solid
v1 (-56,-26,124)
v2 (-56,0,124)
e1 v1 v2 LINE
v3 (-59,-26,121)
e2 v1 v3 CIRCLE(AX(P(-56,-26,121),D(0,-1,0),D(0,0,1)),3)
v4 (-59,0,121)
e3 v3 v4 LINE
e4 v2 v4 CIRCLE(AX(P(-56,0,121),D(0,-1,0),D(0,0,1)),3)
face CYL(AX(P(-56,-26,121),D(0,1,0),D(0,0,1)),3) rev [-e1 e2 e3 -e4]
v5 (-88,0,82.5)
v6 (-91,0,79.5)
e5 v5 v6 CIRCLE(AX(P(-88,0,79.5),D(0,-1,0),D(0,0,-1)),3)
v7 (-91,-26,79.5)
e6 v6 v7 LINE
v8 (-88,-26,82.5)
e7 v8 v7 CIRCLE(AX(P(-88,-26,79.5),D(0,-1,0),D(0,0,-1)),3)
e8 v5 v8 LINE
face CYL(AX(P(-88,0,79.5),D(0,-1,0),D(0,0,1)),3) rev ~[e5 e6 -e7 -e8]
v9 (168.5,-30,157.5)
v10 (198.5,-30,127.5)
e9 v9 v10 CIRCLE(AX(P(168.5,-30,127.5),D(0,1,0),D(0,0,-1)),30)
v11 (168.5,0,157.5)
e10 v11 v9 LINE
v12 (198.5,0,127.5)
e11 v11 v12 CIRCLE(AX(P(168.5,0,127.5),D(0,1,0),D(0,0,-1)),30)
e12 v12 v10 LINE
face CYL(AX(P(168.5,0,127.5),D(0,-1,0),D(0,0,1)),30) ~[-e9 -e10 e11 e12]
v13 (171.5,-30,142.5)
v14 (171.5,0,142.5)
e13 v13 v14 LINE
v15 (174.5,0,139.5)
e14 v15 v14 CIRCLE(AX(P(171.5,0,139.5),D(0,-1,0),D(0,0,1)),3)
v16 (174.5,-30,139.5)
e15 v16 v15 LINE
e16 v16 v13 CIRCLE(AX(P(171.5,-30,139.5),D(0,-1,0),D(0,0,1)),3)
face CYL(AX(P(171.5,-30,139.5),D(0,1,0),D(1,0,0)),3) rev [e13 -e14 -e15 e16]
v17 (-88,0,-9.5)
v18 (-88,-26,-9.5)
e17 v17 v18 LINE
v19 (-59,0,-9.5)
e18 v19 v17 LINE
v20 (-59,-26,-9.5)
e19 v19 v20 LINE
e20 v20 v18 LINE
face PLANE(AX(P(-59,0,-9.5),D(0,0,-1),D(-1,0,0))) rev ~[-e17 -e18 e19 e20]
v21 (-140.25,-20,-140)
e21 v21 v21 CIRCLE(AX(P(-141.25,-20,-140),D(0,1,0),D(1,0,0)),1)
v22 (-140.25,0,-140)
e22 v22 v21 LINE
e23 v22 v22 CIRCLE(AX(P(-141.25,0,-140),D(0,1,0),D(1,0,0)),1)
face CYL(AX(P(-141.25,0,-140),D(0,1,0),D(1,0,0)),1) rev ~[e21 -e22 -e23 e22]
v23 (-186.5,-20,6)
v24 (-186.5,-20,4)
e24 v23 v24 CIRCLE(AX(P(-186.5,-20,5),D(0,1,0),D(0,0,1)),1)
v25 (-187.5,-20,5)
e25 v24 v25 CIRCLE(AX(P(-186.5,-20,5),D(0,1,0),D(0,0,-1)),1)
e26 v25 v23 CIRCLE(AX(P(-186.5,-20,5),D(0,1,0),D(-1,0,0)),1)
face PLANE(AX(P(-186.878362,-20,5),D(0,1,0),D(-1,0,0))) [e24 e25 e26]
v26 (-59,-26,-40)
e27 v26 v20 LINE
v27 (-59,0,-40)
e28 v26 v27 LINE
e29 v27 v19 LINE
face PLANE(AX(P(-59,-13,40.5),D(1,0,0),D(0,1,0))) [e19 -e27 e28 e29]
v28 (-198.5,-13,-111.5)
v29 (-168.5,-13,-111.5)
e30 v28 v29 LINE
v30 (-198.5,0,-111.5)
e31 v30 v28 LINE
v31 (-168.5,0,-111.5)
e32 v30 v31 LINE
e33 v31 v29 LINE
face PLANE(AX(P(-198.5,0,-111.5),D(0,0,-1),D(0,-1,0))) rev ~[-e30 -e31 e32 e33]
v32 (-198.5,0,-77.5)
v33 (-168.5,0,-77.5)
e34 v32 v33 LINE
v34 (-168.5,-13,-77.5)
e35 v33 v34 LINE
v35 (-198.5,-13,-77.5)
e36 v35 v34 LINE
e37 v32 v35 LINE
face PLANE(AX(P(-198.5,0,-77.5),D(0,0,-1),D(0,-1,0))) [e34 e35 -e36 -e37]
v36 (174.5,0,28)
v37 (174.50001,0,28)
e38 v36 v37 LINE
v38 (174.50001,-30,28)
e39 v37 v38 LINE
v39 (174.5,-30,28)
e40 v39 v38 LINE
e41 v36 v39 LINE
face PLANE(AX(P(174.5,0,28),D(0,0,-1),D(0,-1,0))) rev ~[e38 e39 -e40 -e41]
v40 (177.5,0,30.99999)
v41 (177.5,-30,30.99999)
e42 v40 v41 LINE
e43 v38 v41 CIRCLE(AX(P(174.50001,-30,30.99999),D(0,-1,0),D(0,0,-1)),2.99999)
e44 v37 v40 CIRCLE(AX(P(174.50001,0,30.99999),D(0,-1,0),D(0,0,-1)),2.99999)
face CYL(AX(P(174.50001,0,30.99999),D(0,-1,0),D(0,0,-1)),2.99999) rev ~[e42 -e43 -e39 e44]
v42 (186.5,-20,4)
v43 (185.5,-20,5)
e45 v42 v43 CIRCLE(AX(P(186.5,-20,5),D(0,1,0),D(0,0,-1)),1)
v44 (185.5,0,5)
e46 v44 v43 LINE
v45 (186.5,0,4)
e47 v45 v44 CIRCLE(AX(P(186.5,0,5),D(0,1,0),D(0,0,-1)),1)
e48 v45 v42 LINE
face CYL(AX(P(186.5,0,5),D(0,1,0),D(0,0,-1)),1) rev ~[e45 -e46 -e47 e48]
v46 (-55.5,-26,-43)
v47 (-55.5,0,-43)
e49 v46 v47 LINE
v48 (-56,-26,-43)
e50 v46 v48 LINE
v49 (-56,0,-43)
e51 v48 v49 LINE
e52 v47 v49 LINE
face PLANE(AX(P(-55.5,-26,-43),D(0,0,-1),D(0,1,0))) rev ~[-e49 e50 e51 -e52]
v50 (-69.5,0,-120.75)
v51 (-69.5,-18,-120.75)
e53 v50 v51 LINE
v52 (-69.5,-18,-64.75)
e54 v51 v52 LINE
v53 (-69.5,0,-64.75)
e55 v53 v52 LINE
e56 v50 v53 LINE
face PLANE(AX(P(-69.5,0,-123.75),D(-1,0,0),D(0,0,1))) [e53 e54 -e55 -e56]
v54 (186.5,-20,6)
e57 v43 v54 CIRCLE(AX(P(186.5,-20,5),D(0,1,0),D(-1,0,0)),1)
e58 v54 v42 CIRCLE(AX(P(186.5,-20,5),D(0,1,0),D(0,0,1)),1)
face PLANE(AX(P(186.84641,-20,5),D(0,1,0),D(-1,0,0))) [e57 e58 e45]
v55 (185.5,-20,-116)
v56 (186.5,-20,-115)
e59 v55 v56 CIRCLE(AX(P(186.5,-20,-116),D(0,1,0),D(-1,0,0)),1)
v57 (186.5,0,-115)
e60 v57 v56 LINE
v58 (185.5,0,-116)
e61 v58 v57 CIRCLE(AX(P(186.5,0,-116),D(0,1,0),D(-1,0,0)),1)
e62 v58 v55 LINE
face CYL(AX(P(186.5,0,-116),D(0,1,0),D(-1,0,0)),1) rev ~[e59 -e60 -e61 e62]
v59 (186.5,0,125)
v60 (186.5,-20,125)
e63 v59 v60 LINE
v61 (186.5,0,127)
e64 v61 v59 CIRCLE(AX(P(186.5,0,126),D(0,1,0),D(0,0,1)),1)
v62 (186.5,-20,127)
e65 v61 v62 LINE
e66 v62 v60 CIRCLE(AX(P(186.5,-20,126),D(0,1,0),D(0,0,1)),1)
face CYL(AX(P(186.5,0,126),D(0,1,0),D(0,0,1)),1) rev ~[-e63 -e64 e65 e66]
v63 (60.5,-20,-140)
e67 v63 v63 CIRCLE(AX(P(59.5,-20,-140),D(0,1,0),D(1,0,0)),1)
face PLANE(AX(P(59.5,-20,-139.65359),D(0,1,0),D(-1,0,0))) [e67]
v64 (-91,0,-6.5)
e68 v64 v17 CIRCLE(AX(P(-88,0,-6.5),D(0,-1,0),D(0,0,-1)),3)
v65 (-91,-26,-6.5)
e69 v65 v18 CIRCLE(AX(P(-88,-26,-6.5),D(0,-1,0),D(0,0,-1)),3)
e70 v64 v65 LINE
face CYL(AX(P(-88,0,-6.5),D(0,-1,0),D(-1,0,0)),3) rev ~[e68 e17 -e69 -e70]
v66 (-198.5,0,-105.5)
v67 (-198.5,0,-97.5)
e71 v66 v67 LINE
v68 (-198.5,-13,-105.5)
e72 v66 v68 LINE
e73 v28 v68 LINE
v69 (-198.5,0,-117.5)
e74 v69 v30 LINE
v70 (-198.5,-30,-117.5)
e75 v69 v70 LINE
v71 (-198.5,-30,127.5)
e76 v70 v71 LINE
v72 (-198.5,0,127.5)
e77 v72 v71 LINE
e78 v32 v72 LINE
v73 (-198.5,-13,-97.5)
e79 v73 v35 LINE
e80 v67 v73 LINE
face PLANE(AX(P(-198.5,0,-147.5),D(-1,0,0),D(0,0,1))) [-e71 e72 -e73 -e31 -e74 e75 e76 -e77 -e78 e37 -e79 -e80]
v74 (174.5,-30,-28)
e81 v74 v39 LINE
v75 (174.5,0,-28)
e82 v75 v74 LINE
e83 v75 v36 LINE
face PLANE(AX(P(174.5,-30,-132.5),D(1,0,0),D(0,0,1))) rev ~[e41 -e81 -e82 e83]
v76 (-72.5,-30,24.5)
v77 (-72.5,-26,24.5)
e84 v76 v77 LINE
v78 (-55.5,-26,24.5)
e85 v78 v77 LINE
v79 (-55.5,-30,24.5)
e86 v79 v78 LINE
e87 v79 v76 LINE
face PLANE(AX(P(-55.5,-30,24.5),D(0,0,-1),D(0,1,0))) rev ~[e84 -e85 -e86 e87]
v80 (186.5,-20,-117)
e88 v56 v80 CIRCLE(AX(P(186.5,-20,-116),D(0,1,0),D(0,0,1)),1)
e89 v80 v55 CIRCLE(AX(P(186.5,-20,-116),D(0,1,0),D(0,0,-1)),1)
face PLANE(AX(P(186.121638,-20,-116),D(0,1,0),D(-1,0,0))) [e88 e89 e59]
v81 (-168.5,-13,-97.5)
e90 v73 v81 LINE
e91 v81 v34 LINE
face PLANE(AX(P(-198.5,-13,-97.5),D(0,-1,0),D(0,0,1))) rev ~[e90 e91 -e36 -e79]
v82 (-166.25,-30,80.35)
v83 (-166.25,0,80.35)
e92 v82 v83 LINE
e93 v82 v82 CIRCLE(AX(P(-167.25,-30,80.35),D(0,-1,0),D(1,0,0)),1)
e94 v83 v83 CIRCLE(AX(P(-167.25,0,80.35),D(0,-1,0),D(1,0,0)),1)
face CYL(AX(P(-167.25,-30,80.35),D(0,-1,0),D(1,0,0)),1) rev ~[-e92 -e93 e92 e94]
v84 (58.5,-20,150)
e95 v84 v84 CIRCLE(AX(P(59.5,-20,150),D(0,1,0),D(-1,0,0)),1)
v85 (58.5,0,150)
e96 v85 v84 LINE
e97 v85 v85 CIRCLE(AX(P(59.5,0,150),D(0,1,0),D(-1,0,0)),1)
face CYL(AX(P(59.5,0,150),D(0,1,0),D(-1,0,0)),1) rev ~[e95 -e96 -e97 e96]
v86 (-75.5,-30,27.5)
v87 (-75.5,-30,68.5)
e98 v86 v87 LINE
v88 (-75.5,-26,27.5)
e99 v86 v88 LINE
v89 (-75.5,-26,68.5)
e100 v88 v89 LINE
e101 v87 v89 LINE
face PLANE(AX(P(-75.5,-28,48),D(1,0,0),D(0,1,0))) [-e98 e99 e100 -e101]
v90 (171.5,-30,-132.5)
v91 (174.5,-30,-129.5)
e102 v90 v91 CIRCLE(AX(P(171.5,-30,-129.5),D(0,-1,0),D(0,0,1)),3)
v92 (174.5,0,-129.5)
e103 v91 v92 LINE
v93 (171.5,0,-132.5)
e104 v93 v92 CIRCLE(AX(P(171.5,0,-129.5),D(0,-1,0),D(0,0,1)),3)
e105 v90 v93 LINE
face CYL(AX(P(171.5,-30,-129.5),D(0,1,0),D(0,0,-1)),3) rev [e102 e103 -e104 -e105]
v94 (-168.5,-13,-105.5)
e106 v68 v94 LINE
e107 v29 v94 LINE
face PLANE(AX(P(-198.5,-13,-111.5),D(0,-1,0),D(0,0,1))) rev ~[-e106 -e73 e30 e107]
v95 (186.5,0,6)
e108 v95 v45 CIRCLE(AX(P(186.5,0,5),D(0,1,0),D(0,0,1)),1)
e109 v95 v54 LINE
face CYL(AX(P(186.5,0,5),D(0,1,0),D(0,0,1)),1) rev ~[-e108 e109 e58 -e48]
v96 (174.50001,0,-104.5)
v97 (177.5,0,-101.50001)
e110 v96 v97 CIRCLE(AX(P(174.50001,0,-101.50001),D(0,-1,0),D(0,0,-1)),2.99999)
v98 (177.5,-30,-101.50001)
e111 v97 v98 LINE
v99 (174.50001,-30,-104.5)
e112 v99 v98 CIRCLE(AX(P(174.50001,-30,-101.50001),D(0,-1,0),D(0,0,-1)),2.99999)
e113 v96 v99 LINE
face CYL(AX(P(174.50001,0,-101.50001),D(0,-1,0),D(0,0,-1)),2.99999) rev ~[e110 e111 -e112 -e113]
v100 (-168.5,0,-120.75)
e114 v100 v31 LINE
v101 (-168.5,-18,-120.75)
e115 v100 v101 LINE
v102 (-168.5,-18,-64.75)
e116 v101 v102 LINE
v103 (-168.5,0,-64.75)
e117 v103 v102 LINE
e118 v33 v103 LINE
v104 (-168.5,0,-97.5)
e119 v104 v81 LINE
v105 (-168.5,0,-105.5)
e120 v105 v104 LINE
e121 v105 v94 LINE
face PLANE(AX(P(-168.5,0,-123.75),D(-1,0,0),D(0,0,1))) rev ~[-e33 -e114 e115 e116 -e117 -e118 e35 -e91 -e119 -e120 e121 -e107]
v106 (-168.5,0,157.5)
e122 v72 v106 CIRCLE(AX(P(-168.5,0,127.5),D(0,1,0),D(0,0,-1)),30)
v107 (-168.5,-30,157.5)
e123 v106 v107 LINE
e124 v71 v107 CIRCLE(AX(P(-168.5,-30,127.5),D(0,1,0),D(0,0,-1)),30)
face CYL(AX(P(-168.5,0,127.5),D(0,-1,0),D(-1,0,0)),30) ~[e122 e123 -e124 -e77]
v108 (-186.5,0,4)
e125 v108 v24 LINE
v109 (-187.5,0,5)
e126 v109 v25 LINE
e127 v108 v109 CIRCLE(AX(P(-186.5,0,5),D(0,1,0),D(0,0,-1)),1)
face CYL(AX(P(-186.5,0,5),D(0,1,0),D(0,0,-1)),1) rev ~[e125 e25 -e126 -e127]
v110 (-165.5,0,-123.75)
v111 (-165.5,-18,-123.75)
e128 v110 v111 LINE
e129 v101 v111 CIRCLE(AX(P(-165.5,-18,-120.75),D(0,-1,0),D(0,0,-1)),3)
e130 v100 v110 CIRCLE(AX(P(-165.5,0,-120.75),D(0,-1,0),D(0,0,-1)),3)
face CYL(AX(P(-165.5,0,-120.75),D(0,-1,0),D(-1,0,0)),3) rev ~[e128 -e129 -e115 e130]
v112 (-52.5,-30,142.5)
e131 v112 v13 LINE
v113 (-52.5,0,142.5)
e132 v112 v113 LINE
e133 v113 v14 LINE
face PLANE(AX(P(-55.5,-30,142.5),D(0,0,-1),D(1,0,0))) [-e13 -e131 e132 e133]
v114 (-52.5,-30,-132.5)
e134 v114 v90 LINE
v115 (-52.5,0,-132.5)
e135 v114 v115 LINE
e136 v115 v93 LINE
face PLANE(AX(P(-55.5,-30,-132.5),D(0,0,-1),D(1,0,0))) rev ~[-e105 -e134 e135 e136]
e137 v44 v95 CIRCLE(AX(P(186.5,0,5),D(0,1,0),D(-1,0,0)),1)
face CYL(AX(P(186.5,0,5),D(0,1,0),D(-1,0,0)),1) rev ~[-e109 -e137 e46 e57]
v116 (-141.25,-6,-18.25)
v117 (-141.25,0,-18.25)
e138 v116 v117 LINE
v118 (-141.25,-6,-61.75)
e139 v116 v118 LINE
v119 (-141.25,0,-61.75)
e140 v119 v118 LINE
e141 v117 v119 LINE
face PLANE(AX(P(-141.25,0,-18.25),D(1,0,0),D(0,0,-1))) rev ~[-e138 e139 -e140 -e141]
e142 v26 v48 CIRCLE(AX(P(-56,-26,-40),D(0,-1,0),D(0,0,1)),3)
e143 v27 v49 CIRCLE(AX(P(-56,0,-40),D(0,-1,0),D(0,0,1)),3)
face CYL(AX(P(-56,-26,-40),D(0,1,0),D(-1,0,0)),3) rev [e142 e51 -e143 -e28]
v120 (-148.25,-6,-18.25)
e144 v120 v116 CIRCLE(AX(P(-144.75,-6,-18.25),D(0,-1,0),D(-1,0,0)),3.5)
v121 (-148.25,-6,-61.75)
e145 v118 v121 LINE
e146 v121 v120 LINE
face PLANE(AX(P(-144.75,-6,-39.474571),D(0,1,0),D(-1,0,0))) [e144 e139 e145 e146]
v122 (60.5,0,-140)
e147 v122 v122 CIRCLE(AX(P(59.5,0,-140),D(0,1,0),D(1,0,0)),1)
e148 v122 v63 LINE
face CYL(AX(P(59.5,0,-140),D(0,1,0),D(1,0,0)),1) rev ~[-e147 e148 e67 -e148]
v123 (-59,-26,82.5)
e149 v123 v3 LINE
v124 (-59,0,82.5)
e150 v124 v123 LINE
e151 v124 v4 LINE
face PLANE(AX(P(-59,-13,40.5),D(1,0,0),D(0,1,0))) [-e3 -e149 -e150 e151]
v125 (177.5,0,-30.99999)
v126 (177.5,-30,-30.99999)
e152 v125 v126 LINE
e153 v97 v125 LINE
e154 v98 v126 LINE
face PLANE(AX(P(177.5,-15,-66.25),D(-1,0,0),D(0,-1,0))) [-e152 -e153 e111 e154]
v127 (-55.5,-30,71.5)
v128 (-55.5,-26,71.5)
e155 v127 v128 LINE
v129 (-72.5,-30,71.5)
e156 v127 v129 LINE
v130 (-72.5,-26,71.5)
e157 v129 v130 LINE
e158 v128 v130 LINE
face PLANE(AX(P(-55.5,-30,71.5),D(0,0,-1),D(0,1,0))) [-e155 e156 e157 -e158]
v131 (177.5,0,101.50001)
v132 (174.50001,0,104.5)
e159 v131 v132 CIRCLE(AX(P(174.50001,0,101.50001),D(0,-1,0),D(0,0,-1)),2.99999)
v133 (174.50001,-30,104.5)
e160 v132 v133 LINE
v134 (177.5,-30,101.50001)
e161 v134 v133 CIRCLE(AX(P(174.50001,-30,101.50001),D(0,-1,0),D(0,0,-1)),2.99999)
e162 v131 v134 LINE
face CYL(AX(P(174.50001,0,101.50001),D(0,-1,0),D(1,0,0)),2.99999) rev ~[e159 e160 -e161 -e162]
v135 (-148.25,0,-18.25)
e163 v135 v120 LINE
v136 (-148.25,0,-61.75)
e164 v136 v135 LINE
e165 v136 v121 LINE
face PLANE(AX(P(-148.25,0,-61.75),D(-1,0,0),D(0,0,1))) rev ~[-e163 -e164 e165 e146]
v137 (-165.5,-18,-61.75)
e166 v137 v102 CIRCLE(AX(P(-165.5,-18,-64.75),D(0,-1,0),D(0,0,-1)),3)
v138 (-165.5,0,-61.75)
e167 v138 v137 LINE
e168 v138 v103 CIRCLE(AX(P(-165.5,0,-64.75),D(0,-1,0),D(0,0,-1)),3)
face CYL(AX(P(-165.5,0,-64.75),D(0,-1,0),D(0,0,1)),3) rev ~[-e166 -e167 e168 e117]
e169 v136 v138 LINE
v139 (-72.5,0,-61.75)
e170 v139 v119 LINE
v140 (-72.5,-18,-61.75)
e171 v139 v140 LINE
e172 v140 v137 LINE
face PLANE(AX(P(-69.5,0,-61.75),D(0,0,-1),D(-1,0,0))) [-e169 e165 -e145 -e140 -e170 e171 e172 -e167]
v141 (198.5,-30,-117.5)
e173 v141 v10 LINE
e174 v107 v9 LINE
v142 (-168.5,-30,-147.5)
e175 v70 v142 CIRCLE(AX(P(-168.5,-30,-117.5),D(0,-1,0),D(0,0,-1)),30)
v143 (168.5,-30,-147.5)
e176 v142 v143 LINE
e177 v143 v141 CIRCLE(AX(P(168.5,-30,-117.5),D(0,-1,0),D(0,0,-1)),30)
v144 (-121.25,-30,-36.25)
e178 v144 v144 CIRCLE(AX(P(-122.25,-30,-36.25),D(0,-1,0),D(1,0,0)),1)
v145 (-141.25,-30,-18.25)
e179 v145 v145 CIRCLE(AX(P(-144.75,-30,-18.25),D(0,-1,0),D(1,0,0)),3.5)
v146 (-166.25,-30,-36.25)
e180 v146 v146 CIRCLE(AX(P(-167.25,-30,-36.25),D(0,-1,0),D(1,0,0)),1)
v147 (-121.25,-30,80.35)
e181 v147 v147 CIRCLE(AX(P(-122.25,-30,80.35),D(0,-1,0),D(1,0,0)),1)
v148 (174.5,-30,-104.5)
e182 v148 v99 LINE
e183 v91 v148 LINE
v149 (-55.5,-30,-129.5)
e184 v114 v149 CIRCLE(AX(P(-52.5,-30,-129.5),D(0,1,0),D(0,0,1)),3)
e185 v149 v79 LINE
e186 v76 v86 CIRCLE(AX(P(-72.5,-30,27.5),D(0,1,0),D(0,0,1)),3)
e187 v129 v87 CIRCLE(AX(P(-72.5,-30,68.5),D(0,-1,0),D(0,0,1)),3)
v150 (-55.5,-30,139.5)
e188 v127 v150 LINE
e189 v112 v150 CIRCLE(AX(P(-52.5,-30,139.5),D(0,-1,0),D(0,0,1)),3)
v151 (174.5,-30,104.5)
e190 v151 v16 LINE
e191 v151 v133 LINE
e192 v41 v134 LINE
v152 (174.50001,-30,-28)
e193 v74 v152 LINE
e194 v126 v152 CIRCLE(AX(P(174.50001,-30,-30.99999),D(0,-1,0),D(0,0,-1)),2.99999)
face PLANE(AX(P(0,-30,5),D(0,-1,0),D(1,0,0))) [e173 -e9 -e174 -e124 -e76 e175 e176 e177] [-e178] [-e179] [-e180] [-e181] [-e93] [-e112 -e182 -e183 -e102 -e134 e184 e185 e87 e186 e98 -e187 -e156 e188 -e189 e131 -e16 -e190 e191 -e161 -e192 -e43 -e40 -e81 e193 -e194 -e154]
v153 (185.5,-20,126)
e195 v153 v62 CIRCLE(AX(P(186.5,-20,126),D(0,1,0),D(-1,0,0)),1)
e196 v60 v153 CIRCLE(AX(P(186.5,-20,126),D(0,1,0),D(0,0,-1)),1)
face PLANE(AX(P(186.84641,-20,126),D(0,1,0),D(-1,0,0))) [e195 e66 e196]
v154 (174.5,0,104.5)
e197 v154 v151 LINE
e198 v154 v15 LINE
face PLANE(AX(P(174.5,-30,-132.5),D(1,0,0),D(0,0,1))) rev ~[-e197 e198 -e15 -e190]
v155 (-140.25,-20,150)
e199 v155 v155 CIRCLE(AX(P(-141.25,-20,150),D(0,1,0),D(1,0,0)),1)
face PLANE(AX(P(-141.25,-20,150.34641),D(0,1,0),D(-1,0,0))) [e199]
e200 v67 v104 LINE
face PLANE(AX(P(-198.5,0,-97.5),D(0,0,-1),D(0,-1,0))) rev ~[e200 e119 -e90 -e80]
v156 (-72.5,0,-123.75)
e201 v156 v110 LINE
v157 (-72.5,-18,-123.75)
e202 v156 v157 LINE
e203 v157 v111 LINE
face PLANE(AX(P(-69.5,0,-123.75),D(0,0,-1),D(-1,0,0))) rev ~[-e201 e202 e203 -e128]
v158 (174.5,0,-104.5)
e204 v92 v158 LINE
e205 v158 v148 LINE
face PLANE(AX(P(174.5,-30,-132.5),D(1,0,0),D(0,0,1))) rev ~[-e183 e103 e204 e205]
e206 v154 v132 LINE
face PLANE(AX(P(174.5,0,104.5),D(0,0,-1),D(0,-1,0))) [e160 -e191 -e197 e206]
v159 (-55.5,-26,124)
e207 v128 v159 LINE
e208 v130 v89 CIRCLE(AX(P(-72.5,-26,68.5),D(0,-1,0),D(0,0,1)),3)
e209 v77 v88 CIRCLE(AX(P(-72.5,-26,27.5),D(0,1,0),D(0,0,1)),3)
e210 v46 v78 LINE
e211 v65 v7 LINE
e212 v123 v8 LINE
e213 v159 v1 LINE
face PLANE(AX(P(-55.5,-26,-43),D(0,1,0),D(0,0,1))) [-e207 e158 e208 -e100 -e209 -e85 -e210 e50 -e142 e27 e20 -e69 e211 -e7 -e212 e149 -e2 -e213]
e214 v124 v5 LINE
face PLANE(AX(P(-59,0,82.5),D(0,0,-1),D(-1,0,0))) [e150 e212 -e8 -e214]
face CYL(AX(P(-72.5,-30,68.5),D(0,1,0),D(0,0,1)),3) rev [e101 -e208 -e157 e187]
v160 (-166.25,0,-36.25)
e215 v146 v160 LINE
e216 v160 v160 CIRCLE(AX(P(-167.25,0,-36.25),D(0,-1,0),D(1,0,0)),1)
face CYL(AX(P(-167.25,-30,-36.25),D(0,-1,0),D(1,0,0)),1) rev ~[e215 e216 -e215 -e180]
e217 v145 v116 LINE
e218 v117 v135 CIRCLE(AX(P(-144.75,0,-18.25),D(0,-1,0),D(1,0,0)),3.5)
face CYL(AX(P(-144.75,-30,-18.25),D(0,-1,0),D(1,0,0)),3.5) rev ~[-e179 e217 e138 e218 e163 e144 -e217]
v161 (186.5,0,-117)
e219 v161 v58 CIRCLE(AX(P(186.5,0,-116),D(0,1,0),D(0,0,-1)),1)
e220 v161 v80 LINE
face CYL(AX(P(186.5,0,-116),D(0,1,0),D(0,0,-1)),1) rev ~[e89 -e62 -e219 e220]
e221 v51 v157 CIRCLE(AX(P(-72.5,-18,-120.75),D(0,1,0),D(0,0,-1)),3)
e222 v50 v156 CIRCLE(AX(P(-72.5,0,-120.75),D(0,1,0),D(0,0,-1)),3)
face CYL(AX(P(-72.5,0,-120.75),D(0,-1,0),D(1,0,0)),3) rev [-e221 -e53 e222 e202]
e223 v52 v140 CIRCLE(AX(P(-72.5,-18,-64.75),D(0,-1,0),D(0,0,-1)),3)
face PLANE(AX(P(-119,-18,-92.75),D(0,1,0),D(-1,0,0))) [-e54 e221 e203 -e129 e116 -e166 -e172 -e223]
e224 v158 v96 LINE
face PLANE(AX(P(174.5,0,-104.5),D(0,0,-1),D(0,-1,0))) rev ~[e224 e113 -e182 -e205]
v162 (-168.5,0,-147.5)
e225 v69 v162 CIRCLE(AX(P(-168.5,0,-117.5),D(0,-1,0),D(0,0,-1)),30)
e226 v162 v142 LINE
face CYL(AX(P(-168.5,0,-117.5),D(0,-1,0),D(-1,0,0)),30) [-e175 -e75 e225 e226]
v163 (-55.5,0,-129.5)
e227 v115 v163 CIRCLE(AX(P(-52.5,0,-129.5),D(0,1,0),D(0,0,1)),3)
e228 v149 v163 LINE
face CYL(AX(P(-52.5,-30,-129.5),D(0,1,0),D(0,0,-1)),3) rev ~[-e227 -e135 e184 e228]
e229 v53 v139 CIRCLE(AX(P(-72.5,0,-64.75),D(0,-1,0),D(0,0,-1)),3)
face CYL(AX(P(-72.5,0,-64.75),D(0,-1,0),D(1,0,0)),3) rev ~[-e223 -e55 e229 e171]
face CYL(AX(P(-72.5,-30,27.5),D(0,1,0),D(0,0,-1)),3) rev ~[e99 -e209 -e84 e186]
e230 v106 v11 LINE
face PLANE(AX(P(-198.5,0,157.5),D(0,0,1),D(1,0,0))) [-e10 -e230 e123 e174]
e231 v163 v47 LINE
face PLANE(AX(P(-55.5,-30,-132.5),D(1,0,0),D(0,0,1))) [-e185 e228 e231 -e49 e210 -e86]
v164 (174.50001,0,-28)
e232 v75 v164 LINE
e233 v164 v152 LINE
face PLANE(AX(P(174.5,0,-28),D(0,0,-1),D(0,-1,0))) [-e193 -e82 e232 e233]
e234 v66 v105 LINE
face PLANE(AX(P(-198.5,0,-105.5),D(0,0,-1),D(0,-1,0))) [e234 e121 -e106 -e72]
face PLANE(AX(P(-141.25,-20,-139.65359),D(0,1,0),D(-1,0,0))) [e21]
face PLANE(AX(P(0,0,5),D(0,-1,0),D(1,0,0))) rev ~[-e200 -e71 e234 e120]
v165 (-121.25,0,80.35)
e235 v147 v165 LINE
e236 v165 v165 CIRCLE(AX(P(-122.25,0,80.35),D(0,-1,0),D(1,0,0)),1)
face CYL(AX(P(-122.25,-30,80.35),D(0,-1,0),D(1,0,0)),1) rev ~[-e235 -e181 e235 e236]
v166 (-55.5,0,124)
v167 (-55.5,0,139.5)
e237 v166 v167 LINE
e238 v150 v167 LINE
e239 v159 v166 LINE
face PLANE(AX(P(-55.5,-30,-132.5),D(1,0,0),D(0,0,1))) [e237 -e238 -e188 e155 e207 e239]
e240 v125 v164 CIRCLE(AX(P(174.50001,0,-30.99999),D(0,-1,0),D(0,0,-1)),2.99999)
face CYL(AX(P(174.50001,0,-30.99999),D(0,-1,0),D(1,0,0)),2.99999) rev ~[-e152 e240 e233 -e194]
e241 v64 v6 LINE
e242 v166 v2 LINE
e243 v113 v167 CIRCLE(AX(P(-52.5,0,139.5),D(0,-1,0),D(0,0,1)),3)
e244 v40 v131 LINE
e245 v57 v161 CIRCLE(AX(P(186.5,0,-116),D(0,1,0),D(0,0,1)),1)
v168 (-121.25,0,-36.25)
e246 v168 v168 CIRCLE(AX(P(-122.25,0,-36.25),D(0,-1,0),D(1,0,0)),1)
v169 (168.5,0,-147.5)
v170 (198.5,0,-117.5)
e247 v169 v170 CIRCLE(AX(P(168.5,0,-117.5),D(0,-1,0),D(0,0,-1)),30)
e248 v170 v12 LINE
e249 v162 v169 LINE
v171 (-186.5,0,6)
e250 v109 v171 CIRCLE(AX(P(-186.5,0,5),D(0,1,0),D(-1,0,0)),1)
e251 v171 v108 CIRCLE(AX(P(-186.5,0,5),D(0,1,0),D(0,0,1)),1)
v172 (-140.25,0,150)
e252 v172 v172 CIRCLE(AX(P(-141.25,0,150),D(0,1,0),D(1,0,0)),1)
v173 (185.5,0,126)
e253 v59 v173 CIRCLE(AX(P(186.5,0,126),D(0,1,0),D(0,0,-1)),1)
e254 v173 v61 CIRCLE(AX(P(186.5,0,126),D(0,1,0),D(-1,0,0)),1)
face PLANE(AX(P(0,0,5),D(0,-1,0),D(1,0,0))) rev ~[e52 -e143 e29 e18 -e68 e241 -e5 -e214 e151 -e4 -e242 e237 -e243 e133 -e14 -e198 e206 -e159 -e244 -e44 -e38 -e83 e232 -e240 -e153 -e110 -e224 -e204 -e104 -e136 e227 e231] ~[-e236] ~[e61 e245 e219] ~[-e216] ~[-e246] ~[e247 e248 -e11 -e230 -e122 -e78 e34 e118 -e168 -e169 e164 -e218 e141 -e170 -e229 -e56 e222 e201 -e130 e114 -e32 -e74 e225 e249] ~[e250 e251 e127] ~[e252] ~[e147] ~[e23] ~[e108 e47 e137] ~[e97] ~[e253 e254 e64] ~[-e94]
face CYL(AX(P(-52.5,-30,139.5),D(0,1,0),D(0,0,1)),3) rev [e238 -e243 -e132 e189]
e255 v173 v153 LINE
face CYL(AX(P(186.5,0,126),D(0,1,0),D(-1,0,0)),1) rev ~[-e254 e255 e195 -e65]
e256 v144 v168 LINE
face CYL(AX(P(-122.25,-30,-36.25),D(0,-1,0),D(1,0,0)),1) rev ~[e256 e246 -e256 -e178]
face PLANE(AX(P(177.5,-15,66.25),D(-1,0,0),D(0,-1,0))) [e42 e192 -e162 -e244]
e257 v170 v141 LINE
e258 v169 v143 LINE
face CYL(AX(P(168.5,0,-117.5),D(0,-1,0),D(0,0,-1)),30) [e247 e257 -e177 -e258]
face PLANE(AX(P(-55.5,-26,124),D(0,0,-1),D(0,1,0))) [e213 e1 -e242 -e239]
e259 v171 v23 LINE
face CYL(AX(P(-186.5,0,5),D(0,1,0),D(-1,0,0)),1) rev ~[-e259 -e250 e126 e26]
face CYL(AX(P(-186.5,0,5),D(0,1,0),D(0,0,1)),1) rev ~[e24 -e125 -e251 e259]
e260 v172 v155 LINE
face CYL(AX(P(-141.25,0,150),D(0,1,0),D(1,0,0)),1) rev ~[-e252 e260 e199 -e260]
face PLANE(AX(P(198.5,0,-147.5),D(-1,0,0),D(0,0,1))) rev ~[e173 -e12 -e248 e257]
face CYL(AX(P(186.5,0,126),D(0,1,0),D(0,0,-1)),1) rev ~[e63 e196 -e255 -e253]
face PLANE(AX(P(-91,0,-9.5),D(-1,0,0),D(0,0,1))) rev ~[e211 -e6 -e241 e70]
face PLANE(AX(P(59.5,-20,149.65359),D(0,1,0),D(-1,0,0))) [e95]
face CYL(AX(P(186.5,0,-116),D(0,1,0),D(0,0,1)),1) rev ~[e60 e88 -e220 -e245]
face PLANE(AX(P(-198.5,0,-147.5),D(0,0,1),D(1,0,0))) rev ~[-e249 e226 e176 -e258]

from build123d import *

# Parameters (mm, degrees)
F0_W      = 397
F0_H      = 305
F1_DEPTH  = 30
F2_W      = 230
F2_H      = 275
F3_DEPTH  = 30
F4_R      = 3
F5_R      = 30
F6_W      = 26
F6_H      = 167
F7_DEPTH  = 3.5
F8_R      = 3
F10_W     = 32
F10_H     = 92
F11_DEPTH = 26
F12_R     = 3
F13_W     = 4
F13_H     = 47
F14_DEPTH = 20
F15_R     = 3
F16_W     = 30
F16_H     = 76.5
F17_DEPTH = 3
F18_R     = 2.99999
F19_R     = 3.5
F20_DEPTH = 30
F21_W     = 99
F21_H     = 62
F22_DEPTH = 18
F23_R     = 3
F25_DEPTH = 6
F26_W     = 13
F26_H     = 20
F26_H_2   = 6
F27_DEPTH = 30
F28_R     = 1
F29_DEPTH = 30
F31_DEPTH = 20


# Not quite as in the source:
# - a fillet or chamfer is up to 0.001 mm smaller than in the source, because OpenCascade refuses the exact size
# - a feature names something its author has since deleted; it is built from what else it names


with BuildPart() as f1:
    # F0 (on Front) → F1 (new body)
    with BuildSketch(Plane.XZ):
        with Locations((0, 5)):
            Rectangle(F0_W, F0_H)
    extrude(amount=F1_DEPTH)

    # F2 (on face) → F3 (cut, through all)
    with BuildSketch(Plane.XZ.offset(30)):
        with Locations((59.5, 5)):
            Rectangle(F2_W, F2_H)
    extrude(amount=-F3_DEPTH, mode=Mode.SUBTRACT)

    # F4
    f4_edges = [f1.edges().sort_by_distance(p)[0] for p in [
        (-55.5, -15, 142.5),
        (174.5, -15, 142.5),
        (174.5, -15, -132.5),
        (-55.5, -15, -132.5),
    ]]
    fillet(f4_edges, radius=F4_R)

    # F5
    f5_edges = [f1.edges().sort_by_distance(p)[0] for p in [
        (-198.5, -15, -147.5),
        (-198.5, -15, 157.5),
        (198.5, -15, 157.5),
        (198.5, -15, -147.5),
    ]]
    fillet(f5_edges, radius=F5_R)

    # F6 (on face) → F7 (cut)
    with BuildSketch(Plane.YZ.offset(-55.5)):
        with Locations((-13, 40.5)):
            Rectangle(F6_W, F6_H)
    extrude(amount=-F7_DEPTH, mode=Mode.SUBTRACT)

    # F8
    f8_edges = [f1.edges().sort_by_distance(p)[0] for p in [
        (-59, -13, -43),
        (-59, -13, 124),
    ]]
    fillet(f8_edges, radius=F8_R)

    # F10 (on face) → F11 (cut)
    with BuildSketch(Plane(origin=(0, 0, 0), x_dir=(-1, 0, 0), z_dir=(0, 1, 0))):
        with Locations((75, 36.5)):
            Rectangle(F10_W, F10_H)
    extrude(amount=-F11_DEPTH, mode=Mode.SUBTRACT)

    # F12
    f12_edges = [f1.edges().sort_by_distance(p)[0] for p in [
        (-91, -13, -9.5),
        (-91, -13, 82.5),
    ]]
    fillet(f12_edges, radius=F12_R)

    # F13 (on face) → F14 (cut)
    with BuildSketch(Plane.YZ.offset(-55.5)):
        with Locations((-28, 48)):
            Rectangle(F13_W, F13_H)
    extrude(amount=-F14_DEPTH, mode=Mode.SUBTRACT)

    # F15
    f15_edges = [f1.edges().sort_by_distance(p)[0] for p in [
        (-75.5, -28, 24.5),
        (-75.5, -28, 71.5),
    ]]
    fillet(f15_edges, radius=F15_R)

    # F16 (on face) → F17 (cut)
    with BuildSketch(Plane(origin=(174.5, 0, 0), x_dir=(0, -1, 0), z_dir=(-1, 0, 0))):
        with Locations((15, -66.25)):
            Rectangle(F16_W, F16_H)
        with Locations((15, 66.25)):
            Rectangle(F16_W, F16_H)
    extrude(amount=-F17_DEPTH, mode=Mode.SUBTRACT)

    # F18 (radius 3 in the source; OpenCascade refuses exactly that, so slightly less here)
    f18_edges = [f1.edges().sort_by_distance(p)[0] for p in [
        (177.5, -15, -104.5),
        (177.5, -15, 28),
        (177.5, -15, 104.5),
        (177.5, -15, -28),
    ]]
    fillet(f18_edges, radius=F18_R)

    # F19 (on face) → F20 (cut)
    with BuildSketch(Plane.XZ.offset(30)):
        with Locations((-144.75, -18.25)):
            Circle(F19_R)
    extrude(amount=-F20_DEPTH, mode=Mode.SUBTRACT)

    # F21 (on face) → F22 (cut)
    with BuildSketch(Plane(origin=(0, 0, 0), x_dir=(-1, 0, 0), z_dir=(0, 1, 0))):
        with Locations((119, -92.75)):
            Rectangle(F21_W, F21_H)
    extrude(amount=-F22_DEPTH, mode=Mode.SUBTRACT)

    # F23
    f23_edges = [f1.edges().sort_by_distance(p)[0] for p in [
        (-168.5, -9, -123.75),
        (-69.5, -9, -123.75),
        (-69.5, -9, -61.75),
        (-168.5, -9, -61.75),
    ]]
    fillet(f23_edges, radius=F23_R)

    # F24 (on face) → F25 (cut)
    with BuildSketch(Plane(origin=(0, 0, 0), x_dir=(-1, 0, 0), z_dir=(0, 1, 0))):
        with BuildLine():
            ThreePointArc((148.25, -18.25), (144.75, -21.75), (141.25, -18.25))
            Line((141.25, -18.25), (141.25, -61.75))
            Line((141.25, -61.75), (148.25, -61.75))
            Line((148.25, -61.75), (148.25, -18.25))
        make_face()
    extrude(amount=-F25_DEPTH, mode=Mode.SUBTRACT)

    # F26 (on face) → F27 (cut)
    with BuildSketch(Plane(origin=(-198.5, 0, 0), x_dir=(0, -1, 0), z_dir=(-1, 0, 0))):
        with Locations((6.5, -87.5)):
            Rectangle(F26_W, F26_H)
        with Locations((6.5, -108.5)):
            Rectangle(F26_W, F26_H_2)
    extrude(amount=-F27_DEPTH, mode=Mode.SUBTRACT)

    # F28 (on face) → F29 (cut)
    with BuildSketch(Plane.XZ.offset(30)):
        with Locations((-167.25, 80.35)):
            Circle(F28_R)
        with Locations((-167.25, -36.25)):
            Circle(F28_R)
        with Locations((-122.25, -36.25)):
            Circle(F28_R)
        with Locations((-122.25, 80.35)):
            Circle(F28_R)
    extrude(amount=-F29_DEPTH, mode=Mode.SUBTRACT)

    # F30 (on face) → F31 (cut)
    with BuildSketch(Plane(origin=(0, 0, 0), x_dir=(-1, 0, 0), z_dir=(0, 1, 0))):
        with BuildLine():
            Line((-186.5, 125), (-186.5, 127))
            ThreePointArc((-186.5, 127), (-187.5, 126), (-186.5, 125))
        make_face()
        with BuildLine():
            ThreePointArc((-185.5, 126), (-185.7928932188, 126.7071067812), (-186.5, 127))
            Line((-186.5, 127), (-186.5, 125))
            ThreePointArc((-186.5, 125), (-185.7928932188, 125.2928932188), (-185.5, 126))
        make_face()
        with BuildLine():
            ThreePointArc((-60.5, 150), (-59.5, 149), (-58.5, 150))
            Line((-58.5, 150), (-60.5, 150))
        make_face()
        with BuildLine():
            Line((-60.5, 150), (-58.5, 150))
            ThreePointArc((-58.5, 150), (-59.5, 151), (-60.5, 150))
        make_face()
        with BuildLine():
            Line((140.25, 150), (142.25, 150))
            ThreePointArc((142.25, 150), (141.25, 151), (140.25, 150))
        make_face()
        with BuildLine():
            ThreePointArc((140.25, 150), (141.25, 149), (142.25, 150))
            Line((142.25, 150), (140.25, 150))
        make_face()
        with BuildLine():
            ThreePointArc((187.5, 5), (187.2071067812, 5.7071067812), (186.5, 6))
            Line((186.5, 6), (186.5, 4))
            ThreePointArc((186.5, 4), (187.2071067812, 4.2928932188), (187.5, 5))
        make_face()
        with BuildLine():
            Line((186.5, 4), (186.5, 6))
            ThreePointArc((186.5, 6), (185.5, 5), (186.5, 4))
        make_face()
        with BuildLine():
            Line((140.25, -140), (142.25, -140))
            ThreePointArc((142.25, -140), (141.25, -139), (140.25, -140))
        make_face()
        with BuildLine():
            ThreePointArc((140.25, -140), (141.25, -141), (142.25, -140))
            Line((142.25, -140), (140.25, -140))
        make_face()
        with BuildLine():
            Line((-60.5, -140), (-58.5, -140))
            ThreePointArc((-58.5, -140), (-59.5, -139), (-60.5, -140))
        make_face()
        with BuildLine():
            ThreePointArc((-60.5, -140), (-59.5, -141), (-58.5, -140))
            Line((-58.5, -140), (-60.5, -140))
        make_face()
        with BuildLine():
            ThreePointArc((-185.5, -116), (-185.7928932188, -115.2928932188), (-186.5, -115))
            Line((-186.5, -115), (-186.5, -117))
            ThreePointArc((-186.5, -117), (-185.7928932188, -116.7071067812), (-185.5, -116))
        make_face()
        with BuildLine():
            Line((-186.5, -117), (-186.5, -115))
            ThreePointArc((-186.5, -115), (-187.5, -116), (-186.5, -117))
        make_face()
        with BuildLine():
            Line((-186.5, 4), (-186.5, 6))
            ThreePointArc((-186.5, 6), (-187.5, 5), (-186.5, 4))
        make_face()
        with BuildLine():
            ThreePointArc((-185.5, 5), (-185.7928932188, 5.7071067812), (-186.5, 6))
            Line((-186.5, 6), (-186.5, 4))
            ThreePointArc((-186.5, 4), (-185.7928932188, 4.2928932188), (-185.5, 5))
        make_face()
    extrude(amount=-F31_DEPTH, mode=Mode.SUBTRACT)


solid = f1.part
